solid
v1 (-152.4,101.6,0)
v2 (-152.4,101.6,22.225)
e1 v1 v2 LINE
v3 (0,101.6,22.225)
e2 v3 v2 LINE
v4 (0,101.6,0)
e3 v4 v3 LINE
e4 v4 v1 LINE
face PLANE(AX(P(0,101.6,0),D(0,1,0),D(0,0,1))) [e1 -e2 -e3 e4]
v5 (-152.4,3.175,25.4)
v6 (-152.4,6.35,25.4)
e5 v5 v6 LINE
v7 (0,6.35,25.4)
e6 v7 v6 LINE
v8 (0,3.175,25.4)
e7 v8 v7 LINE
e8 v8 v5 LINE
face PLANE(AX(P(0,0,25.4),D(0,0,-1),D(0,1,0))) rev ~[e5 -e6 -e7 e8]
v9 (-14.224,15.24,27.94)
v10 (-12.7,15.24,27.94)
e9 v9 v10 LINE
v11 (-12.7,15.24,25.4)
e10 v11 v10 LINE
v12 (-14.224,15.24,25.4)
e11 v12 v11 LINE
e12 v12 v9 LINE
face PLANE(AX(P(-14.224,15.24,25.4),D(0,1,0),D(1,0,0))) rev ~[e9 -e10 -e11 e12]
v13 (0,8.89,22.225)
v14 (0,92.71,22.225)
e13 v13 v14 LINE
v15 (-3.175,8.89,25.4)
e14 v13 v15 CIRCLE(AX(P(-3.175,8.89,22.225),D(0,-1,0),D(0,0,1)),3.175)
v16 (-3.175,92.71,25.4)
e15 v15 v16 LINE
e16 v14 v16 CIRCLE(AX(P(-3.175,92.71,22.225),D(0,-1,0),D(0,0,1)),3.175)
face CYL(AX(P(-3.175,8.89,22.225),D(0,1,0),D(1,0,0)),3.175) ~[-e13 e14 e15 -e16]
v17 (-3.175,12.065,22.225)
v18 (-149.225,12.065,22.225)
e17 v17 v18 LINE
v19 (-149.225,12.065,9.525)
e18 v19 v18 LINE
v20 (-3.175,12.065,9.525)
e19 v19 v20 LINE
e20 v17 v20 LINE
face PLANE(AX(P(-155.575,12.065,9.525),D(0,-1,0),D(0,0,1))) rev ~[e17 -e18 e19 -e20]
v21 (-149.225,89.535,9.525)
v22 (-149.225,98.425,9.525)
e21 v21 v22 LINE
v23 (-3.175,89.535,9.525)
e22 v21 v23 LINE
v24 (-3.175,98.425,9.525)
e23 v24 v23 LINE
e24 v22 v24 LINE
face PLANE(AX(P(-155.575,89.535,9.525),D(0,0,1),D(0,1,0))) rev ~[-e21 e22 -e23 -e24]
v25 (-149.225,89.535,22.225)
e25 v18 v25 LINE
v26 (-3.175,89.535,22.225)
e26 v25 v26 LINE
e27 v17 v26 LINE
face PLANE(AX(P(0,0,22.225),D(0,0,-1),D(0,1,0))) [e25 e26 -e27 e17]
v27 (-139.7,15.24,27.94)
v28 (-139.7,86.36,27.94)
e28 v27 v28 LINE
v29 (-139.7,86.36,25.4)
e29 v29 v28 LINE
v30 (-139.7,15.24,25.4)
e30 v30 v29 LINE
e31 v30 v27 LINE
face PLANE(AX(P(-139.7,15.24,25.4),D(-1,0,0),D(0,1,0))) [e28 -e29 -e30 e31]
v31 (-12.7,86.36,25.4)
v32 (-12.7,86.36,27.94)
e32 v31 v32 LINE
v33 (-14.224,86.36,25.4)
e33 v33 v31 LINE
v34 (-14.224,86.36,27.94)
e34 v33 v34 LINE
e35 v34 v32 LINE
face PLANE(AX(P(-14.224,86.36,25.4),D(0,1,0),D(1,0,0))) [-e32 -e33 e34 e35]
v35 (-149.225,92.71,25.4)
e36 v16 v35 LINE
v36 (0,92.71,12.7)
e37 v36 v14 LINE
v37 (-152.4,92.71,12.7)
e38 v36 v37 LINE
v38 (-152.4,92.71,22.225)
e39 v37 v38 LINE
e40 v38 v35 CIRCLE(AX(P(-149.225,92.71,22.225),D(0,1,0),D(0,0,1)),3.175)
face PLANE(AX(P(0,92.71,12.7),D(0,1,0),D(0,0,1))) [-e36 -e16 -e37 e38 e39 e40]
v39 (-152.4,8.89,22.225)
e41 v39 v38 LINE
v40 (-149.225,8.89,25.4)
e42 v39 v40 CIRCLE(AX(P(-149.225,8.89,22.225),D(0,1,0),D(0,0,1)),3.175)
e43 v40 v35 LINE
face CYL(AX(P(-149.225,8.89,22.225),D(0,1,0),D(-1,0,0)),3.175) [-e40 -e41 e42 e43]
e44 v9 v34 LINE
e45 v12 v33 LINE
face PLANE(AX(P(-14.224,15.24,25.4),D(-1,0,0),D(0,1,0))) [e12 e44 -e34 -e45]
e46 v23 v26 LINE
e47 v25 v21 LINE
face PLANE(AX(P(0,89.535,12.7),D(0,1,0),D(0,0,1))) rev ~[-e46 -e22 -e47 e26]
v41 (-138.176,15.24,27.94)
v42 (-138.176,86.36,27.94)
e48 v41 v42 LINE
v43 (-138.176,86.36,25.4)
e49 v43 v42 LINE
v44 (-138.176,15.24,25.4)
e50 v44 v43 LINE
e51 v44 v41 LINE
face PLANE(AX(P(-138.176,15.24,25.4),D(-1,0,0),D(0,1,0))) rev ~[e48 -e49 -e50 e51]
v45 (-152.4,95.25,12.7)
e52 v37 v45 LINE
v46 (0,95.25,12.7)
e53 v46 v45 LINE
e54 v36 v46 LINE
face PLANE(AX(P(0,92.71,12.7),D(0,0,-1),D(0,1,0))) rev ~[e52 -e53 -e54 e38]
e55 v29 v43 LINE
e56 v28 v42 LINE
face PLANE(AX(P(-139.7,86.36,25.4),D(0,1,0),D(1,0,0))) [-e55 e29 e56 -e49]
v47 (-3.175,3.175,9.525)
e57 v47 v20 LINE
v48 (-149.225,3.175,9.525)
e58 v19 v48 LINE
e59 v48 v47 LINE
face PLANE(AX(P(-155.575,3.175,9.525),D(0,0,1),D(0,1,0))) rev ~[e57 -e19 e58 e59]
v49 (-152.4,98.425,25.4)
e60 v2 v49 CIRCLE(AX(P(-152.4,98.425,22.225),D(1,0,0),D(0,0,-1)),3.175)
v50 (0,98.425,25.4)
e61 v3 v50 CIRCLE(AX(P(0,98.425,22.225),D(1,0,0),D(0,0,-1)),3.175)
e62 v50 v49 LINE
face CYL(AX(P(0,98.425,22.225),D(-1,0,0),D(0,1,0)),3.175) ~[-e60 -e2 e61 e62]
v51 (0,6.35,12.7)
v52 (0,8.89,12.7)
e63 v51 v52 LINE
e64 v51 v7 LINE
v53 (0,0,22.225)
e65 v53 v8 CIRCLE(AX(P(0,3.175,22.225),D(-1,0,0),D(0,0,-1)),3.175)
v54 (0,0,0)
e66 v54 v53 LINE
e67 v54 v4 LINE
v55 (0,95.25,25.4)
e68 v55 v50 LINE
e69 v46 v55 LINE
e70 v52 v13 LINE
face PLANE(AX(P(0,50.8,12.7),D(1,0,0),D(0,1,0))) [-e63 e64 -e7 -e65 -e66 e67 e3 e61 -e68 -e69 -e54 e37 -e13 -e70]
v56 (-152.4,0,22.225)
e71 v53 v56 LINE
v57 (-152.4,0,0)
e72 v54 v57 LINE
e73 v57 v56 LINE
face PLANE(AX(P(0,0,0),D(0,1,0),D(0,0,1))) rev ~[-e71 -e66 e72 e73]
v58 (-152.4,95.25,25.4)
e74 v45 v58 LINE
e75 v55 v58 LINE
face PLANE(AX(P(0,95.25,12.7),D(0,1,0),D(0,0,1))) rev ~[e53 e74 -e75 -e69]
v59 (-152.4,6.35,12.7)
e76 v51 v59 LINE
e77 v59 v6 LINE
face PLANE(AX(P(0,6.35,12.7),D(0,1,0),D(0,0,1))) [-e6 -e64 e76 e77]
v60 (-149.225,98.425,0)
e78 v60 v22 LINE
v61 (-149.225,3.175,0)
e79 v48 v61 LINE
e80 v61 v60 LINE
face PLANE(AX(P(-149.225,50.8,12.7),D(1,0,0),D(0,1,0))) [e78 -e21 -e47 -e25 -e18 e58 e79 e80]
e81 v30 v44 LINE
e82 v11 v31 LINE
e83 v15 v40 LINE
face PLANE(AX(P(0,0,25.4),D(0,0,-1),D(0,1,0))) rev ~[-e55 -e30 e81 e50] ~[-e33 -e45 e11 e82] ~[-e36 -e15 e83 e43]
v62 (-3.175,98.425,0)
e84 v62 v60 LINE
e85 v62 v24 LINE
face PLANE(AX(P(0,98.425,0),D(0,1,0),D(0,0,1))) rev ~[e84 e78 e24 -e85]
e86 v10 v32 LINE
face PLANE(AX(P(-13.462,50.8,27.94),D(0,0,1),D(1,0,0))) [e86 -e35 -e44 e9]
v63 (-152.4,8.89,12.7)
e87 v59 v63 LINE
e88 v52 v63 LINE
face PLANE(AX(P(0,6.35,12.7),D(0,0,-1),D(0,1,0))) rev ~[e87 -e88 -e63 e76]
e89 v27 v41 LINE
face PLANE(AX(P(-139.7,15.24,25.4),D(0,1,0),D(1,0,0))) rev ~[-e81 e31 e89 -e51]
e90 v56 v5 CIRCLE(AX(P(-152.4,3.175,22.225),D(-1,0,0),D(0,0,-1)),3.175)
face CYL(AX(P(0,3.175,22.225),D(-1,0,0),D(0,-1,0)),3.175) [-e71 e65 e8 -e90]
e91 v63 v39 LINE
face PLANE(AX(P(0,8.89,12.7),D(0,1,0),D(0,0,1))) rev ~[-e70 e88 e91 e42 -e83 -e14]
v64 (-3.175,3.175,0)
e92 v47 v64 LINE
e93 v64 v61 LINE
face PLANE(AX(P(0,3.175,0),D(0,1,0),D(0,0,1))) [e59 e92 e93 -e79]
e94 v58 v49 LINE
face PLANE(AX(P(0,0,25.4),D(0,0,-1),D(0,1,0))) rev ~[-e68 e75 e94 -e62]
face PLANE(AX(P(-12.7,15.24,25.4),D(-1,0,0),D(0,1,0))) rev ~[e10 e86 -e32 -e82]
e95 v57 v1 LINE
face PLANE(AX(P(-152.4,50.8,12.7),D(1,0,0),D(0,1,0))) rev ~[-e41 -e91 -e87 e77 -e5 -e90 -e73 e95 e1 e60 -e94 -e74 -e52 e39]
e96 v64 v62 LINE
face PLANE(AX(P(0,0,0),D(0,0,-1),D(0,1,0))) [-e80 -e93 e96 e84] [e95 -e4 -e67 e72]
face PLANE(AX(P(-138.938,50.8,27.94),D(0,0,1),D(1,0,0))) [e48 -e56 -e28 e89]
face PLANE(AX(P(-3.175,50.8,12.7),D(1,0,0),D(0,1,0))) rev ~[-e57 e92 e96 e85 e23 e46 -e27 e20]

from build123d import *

# Parameters (mm, degrees)
F0_W        = 101.6
F0_H        = 25.4
F1_DEPTH    = 152.4
F2_W        = 2.54
F2_H        = 12.7
F3_DEPTH    = 152.401
F4_W        = 1.524
F4_H        = 71.12
F5_DEPTH    = 2.54
F6_R        = 3.175
F7_T        = 3.175
F7_T3_DEPTH = 158.75
F7_T5_DEPTH = 77.47
F7_T7_DEPTH = 7.874
F7_T9_DEPTH = 7.874


# Not quite as in the source:
# - a shell that OpenCascade refuses in one call is made with other operations: the cavity is built on its own and cut out


with BuildPart() as f1:
    # F0 (on Right) → F1 (new body)
    with BuildSketch(Plane.YZ):
        with Locations((50.8, 12.7)):
            Rectangle(F0_W, F0_H)
    extrude(amount=-F1_DEPTH)

    # F2 (on face) → F3 (cut, through all)
    with BuildSketch(Plane.YZ):
        with Locations((7.62, 19.05)):
            Rectangle(F2_W, F2_H)
        with Locations((93.98, 19.05)):
            Rectangle(F2_W, F2_H)
    extrude(amount=-F3_DEPTH, mode=Mode.SUBTRACT)

    # F4 (on face) → F5 (join)
    with BuildSketch(Plane.XY.offset(25.4)):
        with Locations((-138.938, 50.8)):
            Rectangle(F4_W, F4_H)
        with Locations((-13.462, 50.8)):
            Rectangle(F4_W, F4_H)
    extrude(amount=F5_DEPTH)

    # F6
    f6_edges = [f1.edges().sort_by_distance(p)[0] for p in [
        (-76.2, 0, 25.4),
        (-76.2, 101.6, 25.4),
        (0, 50.8, 25.4),
        (-152.4, 50.8, 25.4),
    ]]
    fillet(f6_edges, radius=F6_R)

    # F7: shell of thickness 3.175, made by hand


with BuildPart() as f7_core1:
    # F7_t2: copy of F1
    add(f1.part)

    # the walls: a layer under each face that stays
    f7_faces = [f7_core1.faces().sort_by_distance(p)[0] for p in [
        (-76.2, 0, 11.1125),
        (0, 50.8, 12.7),
        (-152.4, 50.8, 12.7),
        (-76.2, 4.7625, 25.4),
        (-76.2, 6.35, 19.05),
        (-76.2, 7.62, 12.7),
        (-76.2, 8.89, 19.05),
        (-76.2, 101.6, 11.1125),
        (-76.2, 92.71, 19.05),
        (-76.2, 96.8375, 25.4),
        (-76.2, 93.98, 12.7),
        (-76.2, 95.25, 19.05),
        (-76.2, 50.8, 25.4),
        (-138.176, 50.8, 26.67),
        (-138.938, 86.36, 26.67),
        (-139.7, 50.8, 26.67),
        (-138.938, 15.24, 26.67),
        (-12.7, 50.8, 26.67),
        (-13.462, 86.36, 26.67),
        (-14.224, 50.8, 26.67),
        (-13.462, 15.24, 26.67),
        (-138.938, 50.8, 27.94),
        (-13.462, 50.8, 27.94),
    ]]
    thicken(f7_faces, amount=-F7_T, mode=Mode.SUBTRACT)

    # F7_s4 → F7_t3 (cut)
    with BuildSketch(Plane.YZ.offset(-155.575)):
        Polygon((6.38175, 12.73175), (3.175, 12.7), (3.175, 9.525), (6.35, 9.525), align=None)
        Polygon((8.85825, 12.73175), (8.89, 9.525), (12.065, 9.525), (12.065, 12.7), align=None)
        Polygon((92.74175, 12.73175), (89.535, 12.7), (89.535, 9.525), (92.71, 9.525), align=None)
        Polygon((95.21825, 12.73175), (95.25, 9.525), (98.425, 9.525), (98.425, 12.7), align=None)
    extrude(amount=F7_T3_DEPTH, mode=Mode.SUBTRACT)

    # F7_s6 → F7_t5 (cut)
    with BuildSketch(Plane.XZ.offset(-89.535)):
        Polygon((-138.14425, 25.43175), (-138.176, 22.225), (-141.351, 22.225), (-141.351, 25.4), align=None)
        Polygon((-139.73175, 25.43175), (-139.7, 22.225), (-136.525, 22.225), (-136.525, 25.4), align=None)
        Polygon((-12.66825, 25.43175), (-12.7, 22.225), (-15.875, 22.225), (-15.875, 25.4), align=None)
        Polygon((-14.25575, 25.43175), (-14.224, 22.225), (-11.049, 22.225), (-11.049, 25.4), align=None)
    extrude(amount=F7_T5_DEPTH, mode=Mode.SUBTRACT)

    # F7_s8 → F7_t7 (cut)
    with BuildSketch(Plane.YZ.offset(-142.875)):
        Polygon((86.39175, 25.43175), (86.36, 22.225), (83.185, 22.225), (83.185, 25.4), align=None)
        Polygon((15.20825, 25.43175), (15.24, 22.225), (18.415, 22.225), (18.415, 25.4), align=None)
    extrude(amount=F7_T7_DEPTH, mode=Mode.SUBTRACT)

    # F7_s10 → F7_t9 (cut)
    with BuildSketch(Plane.YZ.offset(-17.399)):
        Polygon((86.39175, 25.43175), (86.36, 22.225), (83.185, 22.225), (83.185, 25.4), align=None)
        Polygon((15.20825, 25.43175), (15.24, 22.225), (18.415, 22.225), (18.415, 25.4), align=None)
    extrude(amount=F7_T9_DEPTH, mode=Mode.SUBTRACT)


with BuildPart() as f1_1:
    add(f1.part)

    # what is left inside the walls is the cavity
    f7_cavity = [f7_core1.part.solids().sort_by_distance(p)[0] for p in [
        (-100.541667, 50.8, 0.03175),
    ]]
    add(f7_cavity, mode=Mode.SUBTRACT)


solid = f1_1.part
